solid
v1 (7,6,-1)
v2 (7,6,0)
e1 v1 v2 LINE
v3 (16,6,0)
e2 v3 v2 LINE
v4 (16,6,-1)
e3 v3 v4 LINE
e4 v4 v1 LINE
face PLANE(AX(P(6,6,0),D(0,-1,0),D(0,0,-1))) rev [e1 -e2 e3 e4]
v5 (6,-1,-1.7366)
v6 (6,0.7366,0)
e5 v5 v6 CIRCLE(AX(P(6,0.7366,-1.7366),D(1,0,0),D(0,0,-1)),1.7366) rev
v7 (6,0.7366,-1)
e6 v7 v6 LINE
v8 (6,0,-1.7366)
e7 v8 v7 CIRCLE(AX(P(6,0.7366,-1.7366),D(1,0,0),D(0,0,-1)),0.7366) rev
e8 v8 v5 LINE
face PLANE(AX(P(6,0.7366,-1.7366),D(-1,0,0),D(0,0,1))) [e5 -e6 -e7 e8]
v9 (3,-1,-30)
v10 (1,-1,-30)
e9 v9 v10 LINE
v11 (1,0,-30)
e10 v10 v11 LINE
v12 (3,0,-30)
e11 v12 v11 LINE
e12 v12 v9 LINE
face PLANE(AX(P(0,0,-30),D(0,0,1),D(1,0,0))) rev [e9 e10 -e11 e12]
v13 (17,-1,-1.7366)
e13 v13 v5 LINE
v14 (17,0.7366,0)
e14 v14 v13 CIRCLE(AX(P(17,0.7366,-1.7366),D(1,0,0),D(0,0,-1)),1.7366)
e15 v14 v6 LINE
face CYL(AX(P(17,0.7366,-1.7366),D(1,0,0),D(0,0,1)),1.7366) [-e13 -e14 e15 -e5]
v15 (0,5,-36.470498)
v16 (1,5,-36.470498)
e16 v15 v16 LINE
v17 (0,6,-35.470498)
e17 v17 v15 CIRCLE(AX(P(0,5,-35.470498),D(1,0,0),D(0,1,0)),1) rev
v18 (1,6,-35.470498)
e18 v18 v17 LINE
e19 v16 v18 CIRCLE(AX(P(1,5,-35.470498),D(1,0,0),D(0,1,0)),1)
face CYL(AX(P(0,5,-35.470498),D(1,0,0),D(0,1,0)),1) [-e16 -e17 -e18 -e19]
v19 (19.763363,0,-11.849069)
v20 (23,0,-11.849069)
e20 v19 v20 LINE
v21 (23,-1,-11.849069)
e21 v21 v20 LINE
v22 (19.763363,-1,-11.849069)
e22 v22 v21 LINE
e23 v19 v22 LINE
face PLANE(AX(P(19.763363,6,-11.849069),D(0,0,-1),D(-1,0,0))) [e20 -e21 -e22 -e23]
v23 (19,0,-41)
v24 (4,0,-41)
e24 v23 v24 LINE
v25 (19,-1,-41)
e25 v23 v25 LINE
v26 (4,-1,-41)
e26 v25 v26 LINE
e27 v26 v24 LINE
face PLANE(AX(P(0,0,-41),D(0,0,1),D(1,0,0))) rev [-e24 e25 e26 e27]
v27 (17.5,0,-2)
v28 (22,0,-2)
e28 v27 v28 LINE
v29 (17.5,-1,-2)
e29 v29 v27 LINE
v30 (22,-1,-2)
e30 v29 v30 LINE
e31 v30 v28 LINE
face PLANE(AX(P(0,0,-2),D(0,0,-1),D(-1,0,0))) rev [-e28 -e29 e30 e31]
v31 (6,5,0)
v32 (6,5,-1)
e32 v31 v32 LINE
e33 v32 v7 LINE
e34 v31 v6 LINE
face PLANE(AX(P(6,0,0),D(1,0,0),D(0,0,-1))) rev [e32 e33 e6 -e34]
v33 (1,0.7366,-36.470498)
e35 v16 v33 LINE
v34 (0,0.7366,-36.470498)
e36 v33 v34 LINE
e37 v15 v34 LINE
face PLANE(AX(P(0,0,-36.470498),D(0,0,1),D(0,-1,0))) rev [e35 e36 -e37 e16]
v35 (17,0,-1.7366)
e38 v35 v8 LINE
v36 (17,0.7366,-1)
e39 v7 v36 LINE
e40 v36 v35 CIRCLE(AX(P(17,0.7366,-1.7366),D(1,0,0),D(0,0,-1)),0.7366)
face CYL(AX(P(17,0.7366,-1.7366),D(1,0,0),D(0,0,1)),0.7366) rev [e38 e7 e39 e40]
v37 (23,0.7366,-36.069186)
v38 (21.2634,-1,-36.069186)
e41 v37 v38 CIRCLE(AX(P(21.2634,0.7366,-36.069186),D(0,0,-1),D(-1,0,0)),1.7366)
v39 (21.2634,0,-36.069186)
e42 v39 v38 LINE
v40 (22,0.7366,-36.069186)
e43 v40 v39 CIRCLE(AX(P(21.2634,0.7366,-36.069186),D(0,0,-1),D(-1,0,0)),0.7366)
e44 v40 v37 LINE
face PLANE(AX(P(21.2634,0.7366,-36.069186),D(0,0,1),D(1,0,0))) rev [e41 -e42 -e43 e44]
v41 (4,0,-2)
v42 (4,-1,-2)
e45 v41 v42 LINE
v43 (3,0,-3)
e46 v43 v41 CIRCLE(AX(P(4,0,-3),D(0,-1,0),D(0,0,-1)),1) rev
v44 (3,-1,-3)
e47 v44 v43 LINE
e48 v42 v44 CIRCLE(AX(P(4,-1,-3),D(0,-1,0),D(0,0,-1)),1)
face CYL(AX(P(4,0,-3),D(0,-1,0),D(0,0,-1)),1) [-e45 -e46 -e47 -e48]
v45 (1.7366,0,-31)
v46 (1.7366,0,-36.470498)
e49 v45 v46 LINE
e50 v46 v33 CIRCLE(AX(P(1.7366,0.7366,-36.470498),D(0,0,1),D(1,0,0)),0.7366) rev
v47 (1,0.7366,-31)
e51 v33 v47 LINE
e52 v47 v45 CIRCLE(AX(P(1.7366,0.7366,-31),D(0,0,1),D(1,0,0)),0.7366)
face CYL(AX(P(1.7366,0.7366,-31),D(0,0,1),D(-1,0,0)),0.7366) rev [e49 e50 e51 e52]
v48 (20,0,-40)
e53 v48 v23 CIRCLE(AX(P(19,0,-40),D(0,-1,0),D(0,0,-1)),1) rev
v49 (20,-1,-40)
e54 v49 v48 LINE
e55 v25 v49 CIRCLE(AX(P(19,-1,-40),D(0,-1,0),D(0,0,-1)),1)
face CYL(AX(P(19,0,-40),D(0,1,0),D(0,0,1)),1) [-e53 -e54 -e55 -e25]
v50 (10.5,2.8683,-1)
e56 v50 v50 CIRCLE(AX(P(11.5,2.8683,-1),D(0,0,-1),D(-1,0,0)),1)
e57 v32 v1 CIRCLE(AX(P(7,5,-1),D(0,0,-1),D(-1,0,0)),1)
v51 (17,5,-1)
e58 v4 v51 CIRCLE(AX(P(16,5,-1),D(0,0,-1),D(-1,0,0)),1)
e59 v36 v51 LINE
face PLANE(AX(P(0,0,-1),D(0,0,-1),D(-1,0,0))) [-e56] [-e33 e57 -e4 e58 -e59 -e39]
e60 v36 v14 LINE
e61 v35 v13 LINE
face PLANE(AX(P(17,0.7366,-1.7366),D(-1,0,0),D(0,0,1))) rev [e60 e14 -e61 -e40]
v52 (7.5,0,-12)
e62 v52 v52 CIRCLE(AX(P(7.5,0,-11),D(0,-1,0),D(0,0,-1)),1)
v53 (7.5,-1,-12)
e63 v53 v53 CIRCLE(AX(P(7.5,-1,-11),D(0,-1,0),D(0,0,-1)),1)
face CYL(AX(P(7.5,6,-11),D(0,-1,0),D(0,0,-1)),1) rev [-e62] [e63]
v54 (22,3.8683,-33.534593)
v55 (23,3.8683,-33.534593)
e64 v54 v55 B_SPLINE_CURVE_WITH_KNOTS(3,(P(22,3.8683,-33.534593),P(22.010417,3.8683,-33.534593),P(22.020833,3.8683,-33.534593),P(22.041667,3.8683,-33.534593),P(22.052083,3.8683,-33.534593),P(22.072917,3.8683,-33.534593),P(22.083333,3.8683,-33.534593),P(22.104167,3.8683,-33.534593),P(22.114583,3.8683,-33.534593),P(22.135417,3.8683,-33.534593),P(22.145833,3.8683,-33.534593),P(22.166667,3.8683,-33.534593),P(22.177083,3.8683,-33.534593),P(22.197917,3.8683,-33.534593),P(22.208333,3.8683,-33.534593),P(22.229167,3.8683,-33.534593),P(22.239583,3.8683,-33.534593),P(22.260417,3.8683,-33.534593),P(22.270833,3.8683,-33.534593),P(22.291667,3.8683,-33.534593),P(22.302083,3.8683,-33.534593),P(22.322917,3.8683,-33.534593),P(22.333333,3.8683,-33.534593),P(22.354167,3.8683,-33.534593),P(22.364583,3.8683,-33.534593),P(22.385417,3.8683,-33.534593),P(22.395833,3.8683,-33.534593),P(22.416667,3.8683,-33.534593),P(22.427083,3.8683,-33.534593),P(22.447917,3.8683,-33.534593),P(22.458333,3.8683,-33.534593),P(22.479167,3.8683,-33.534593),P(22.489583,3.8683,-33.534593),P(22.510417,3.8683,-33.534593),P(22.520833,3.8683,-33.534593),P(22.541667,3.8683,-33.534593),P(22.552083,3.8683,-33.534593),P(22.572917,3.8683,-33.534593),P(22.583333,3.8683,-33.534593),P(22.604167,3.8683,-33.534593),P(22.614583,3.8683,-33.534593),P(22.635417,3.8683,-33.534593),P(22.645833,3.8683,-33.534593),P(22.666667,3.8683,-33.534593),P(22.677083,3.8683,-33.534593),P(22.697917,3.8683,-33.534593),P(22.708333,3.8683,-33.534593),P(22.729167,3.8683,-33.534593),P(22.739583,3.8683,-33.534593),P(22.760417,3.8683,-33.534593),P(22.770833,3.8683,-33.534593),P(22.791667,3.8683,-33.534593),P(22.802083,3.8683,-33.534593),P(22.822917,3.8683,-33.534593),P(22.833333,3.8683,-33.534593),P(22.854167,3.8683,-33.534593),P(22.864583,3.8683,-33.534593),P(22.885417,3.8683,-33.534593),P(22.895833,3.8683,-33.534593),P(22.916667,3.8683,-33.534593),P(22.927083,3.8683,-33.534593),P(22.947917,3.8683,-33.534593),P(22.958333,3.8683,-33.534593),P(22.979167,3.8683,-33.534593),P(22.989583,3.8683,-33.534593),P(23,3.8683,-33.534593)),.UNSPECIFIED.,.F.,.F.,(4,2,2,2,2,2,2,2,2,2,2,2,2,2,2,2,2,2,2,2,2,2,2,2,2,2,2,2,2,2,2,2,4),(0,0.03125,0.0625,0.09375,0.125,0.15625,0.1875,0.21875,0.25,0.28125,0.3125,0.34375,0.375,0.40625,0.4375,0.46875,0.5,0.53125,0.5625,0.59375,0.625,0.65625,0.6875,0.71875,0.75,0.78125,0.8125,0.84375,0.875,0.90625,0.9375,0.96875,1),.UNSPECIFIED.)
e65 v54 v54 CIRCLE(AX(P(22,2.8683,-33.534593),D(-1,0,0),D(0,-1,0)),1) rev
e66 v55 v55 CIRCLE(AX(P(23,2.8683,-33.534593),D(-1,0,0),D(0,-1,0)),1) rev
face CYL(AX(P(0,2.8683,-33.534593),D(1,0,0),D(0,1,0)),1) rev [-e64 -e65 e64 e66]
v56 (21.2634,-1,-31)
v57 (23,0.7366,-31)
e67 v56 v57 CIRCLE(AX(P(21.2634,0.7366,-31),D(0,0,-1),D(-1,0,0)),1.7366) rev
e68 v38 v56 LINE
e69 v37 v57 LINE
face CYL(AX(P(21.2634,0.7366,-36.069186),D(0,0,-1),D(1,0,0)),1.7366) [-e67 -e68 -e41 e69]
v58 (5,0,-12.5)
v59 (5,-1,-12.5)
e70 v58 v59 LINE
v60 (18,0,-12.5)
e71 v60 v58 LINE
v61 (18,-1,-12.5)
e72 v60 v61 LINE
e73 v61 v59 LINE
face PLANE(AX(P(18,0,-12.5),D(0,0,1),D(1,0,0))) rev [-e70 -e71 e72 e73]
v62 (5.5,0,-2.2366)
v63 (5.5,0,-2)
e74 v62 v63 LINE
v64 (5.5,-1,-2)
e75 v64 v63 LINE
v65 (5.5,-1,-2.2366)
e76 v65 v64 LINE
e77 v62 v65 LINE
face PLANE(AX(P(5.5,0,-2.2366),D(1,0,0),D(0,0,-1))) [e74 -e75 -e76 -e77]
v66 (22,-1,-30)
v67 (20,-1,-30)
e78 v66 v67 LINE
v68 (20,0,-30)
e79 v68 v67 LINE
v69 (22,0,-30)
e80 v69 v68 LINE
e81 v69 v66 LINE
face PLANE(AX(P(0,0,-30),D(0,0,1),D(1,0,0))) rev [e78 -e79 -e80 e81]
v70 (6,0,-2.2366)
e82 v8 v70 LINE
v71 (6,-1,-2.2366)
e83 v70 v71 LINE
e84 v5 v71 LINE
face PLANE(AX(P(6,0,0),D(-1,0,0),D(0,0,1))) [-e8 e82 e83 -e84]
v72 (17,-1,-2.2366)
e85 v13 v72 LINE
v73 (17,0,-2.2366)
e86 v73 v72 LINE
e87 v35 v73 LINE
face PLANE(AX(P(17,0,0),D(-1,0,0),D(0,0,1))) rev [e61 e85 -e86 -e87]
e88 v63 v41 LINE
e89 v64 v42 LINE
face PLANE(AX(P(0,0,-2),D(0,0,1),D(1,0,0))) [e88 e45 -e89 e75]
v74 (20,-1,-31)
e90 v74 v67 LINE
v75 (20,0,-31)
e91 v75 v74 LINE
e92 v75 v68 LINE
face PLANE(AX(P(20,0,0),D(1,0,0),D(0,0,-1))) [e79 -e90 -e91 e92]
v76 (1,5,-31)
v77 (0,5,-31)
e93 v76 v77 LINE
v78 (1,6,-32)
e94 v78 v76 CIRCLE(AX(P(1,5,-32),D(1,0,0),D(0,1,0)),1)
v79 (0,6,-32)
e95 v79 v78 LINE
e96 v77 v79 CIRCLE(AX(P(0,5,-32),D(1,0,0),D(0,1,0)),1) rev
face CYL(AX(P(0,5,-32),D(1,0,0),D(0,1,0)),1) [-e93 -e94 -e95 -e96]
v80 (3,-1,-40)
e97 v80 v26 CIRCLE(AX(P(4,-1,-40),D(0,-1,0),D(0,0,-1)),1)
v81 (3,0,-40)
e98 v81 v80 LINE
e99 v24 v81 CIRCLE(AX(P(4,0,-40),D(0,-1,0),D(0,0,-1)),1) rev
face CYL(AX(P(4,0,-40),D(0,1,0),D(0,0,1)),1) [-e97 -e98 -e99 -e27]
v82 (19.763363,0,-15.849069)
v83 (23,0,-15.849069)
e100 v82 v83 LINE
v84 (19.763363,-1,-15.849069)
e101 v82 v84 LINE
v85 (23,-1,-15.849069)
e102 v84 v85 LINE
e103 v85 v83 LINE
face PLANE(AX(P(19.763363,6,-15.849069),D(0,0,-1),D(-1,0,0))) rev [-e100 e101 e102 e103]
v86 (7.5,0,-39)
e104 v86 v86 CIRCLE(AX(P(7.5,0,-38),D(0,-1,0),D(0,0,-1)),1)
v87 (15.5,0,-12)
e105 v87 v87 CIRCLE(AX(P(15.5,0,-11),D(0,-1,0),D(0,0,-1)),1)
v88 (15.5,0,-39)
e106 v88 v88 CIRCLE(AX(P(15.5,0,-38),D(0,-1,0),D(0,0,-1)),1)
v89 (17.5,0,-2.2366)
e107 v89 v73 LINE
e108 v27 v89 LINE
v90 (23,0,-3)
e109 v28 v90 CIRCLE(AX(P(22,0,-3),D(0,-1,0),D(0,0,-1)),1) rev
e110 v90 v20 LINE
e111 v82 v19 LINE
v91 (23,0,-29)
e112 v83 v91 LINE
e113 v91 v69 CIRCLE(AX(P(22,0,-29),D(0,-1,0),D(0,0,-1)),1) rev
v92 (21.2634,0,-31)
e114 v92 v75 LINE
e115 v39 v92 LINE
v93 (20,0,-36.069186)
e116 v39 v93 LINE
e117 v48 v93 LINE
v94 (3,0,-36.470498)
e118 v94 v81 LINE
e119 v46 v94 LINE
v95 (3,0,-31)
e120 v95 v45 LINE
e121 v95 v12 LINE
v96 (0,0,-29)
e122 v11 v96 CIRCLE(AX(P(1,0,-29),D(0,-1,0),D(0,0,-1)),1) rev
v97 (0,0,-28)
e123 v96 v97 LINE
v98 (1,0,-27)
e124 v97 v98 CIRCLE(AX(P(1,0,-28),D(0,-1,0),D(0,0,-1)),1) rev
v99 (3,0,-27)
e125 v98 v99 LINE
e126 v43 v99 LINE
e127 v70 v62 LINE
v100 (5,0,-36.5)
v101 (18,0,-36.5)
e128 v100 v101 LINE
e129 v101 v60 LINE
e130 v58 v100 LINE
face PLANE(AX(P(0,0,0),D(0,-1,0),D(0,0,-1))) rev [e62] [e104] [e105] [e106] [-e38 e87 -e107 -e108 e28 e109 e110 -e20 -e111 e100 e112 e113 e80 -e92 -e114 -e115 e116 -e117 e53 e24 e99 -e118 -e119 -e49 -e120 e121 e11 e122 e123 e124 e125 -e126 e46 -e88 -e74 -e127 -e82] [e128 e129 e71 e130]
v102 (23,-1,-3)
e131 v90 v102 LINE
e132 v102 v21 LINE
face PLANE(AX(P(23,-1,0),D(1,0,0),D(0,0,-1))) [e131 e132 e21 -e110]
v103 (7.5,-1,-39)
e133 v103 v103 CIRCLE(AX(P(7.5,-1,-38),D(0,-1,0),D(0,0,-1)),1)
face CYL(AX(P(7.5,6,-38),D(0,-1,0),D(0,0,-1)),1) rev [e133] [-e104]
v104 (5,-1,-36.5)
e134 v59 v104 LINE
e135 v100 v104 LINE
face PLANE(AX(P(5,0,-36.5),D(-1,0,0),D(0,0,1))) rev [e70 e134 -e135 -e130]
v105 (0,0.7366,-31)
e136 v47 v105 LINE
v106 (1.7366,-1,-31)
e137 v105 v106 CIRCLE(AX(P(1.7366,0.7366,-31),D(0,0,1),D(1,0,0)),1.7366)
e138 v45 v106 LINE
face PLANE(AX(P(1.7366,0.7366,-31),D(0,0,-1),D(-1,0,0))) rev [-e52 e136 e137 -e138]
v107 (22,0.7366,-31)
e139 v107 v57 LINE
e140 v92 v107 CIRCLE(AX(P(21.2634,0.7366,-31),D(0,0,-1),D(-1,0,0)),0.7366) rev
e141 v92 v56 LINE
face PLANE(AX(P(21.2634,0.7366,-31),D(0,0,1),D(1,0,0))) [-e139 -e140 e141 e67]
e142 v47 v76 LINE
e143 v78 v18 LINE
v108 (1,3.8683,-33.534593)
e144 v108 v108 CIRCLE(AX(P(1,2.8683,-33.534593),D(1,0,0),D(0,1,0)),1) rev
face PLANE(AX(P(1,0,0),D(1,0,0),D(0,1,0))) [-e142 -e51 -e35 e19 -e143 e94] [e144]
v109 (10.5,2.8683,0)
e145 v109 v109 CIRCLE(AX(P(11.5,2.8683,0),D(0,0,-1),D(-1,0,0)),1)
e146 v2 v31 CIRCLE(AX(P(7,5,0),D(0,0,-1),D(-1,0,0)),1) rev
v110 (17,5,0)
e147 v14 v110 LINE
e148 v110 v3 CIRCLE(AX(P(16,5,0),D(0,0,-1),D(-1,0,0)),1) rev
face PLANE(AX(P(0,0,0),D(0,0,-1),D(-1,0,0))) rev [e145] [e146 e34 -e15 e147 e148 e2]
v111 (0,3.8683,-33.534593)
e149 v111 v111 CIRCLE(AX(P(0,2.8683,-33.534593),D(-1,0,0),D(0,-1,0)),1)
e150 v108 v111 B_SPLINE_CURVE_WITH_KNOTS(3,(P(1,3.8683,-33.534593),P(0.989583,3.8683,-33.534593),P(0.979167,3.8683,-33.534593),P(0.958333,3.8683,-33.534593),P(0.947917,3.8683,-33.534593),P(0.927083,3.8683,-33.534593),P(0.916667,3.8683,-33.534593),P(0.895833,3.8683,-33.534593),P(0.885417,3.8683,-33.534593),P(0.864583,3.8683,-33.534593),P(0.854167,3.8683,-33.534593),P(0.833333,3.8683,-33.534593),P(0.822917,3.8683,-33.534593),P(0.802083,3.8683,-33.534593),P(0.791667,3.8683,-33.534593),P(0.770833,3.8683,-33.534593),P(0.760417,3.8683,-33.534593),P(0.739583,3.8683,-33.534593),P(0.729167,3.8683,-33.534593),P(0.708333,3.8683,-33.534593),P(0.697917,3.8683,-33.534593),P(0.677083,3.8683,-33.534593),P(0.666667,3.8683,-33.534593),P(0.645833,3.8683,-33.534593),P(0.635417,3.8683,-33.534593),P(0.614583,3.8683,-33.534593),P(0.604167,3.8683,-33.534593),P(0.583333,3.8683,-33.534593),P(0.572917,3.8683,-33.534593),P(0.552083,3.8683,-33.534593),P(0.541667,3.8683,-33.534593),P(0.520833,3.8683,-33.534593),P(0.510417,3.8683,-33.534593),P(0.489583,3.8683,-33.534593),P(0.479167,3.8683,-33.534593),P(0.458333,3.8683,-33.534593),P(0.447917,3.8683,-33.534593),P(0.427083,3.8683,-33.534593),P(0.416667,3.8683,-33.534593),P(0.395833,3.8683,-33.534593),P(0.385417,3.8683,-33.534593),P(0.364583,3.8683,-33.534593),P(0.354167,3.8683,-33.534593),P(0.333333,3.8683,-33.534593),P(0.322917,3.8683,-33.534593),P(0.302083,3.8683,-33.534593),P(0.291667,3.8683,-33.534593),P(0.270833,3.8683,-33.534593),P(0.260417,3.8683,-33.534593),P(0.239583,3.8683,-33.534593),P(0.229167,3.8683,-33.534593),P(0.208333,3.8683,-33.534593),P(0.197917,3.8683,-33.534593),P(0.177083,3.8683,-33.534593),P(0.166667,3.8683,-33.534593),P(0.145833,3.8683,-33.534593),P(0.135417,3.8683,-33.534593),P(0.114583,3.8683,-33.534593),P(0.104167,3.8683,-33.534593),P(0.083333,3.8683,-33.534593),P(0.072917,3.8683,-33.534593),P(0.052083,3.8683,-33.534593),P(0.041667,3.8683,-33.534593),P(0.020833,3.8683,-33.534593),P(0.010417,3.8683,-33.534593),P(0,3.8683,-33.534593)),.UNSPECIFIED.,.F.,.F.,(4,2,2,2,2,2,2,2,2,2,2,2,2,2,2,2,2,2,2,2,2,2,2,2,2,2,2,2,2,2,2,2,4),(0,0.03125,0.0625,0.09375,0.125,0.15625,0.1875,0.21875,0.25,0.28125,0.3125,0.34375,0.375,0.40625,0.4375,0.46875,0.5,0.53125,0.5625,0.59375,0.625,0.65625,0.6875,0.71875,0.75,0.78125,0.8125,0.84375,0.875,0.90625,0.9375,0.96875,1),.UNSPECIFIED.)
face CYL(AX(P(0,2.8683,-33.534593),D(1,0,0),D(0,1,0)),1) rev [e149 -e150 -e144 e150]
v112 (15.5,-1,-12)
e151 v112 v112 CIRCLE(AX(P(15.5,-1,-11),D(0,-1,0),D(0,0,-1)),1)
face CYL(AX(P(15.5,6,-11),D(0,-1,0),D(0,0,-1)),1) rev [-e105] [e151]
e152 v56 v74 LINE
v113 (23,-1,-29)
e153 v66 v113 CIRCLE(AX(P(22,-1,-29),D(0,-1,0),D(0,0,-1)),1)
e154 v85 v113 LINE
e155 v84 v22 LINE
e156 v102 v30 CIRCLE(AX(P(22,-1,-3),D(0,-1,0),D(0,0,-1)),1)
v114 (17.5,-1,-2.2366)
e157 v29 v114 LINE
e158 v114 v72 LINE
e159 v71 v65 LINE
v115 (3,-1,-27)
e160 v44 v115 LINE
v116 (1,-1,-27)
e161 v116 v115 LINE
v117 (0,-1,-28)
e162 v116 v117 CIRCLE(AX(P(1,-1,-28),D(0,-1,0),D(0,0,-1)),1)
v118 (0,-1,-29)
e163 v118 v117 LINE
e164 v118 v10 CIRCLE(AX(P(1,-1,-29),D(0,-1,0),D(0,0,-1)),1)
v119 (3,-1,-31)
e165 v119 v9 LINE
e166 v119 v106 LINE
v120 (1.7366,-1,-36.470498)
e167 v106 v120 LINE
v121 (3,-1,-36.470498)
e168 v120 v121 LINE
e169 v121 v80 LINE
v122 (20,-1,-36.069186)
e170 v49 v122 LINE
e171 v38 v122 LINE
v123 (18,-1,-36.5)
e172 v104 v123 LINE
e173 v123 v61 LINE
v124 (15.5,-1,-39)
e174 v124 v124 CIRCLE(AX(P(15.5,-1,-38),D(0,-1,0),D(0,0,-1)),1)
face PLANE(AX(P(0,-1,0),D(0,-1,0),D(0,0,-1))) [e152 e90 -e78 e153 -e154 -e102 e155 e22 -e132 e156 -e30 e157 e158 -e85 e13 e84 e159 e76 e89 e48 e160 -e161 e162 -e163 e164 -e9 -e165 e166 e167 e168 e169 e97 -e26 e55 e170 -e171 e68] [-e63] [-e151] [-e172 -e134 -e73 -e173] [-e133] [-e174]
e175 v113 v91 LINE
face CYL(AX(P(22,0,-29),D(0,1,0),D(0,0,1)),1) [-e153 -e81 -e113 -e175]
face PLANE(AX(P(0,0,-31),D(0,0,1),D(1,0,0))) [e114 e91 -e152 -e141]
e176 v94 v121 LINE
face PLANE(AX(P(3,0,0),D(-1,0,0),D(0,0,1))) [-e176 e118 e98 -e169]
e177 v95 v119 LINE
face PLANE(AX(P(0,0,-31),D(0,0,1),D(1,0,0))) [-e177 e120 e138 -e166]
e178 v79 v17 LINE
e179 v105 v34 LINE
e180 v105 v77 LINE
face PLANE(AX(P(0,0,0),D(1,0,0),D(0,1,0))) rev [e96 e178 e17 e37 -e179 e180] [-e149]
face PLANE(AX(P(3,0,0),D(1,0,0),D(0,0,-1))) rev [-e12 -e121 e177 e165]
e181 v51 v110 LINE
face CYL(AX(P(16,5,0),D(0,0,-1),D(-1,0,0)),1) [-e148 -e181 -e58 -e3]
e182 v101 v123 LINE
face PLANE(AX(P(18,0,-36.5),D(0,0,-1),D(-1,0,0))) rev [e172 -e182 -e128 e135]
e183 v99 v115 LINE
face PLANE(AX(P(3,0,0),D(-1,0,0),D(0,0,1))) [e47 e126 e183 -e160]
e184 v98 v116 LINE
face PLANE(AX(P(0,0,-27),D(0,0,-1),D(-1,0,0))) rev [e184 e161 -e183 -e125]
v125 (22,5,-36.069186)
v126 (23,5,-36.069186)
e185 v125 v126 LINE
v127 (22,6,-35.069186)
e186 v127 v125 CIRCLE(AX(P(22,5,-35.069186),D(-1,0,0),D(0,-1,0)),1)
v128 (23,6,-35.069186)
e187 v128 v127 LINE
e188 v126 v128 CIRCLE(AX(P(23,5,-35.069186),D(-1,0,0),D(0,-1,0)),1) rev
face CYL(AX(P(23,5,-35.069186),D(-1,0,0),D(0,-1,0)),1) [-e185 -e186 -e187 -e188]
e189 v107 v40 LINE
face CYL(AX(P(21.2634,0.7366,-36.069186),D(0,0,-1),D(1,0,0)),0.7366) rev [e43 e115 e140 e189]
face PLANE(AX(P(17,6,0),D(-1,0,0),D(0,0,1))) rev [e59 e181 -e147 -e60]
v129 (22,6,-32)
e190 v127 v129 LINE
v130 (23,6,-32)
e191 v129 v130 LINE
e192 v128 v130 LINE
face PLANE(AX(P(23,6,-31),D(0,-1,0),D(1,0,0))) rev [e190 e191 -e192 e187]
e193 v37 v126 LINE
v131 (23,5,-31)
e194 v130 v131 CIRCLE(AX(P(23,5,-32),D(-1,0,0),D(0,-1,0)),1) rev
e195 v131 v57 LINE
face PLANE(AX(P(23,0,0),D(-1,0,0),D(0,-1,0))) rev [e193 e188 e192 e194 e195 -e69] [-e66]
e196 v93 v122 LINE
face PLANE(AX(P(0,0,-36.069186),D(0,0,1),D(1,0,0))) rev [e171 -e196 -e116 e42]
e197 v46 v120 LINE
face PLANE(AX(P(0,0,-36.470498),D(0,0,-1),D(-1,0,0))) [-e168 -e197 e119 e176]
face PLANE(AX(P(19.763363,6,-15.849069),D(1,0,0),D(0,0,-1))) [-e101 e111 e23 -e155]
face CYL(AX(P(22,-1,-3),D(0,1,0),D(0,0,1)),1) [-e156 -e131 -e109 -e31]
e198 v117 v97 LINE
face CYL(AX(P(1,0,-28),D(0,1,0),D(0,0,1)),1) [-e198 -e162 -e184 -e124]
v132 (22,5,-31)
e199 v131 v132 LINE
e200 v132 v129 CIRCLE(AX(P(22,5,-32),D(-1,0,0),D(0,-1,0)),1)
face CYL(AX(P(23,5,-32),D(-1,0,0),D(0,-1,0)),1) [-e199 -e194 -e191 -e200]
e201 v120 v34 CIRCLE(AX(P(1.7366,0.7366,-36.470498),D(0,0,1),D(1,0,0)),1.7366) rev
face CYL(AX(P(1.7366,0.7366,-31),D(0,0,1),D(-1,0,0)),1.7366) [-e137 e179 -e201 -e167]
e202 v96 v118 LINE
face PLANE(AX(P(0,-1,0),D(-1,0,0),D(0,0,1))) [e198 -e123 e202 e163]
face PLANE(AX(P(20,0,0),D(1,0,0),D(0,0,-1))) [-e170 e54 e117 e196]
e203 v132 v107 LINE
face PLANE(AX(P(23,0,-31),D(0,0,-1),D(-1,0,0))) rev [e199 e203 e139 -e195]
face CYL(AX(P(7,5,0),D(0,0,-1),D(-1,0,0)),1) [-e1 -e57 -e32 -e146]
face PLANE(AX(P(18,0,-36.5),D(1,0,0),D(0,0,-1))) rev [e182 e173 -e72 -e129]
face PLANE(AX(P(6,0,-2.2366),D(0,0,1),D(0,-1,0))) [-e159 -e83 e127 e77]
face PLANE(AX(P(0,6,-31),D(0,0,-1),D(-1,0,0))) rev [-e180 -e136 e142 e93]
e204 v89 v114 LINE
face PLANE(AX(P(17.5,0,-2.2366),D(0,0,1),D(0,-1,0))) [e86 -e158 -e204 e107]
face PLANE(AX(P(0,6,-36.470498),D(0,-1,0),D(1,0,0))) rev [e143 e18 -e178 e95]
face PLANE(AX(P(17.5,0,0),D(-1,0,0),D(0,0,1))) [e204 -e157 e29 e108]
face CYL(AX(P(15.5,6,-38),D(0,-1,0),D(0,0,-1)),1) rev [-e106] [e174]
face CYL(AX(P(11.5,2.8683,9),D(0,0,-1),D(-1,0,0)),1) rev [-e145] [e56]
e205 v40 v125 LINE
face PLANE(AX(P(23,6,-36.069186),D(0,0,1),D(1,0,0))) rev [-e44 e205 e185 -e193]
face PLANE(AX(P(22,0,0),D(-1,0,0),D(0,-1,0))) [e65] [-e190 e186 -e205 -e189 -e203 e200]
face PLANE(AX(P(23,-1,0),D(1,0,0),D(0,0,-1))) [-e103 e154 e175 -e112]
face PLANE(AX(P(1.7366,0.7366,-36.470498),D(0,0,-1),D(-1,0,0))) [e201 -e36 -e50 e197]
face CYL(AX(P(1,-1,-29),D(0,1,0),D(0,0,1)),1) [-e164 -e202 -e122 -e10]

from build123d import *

# Parameters (mm, degrees)
SKETCH1_W                = 23
SKETCH1_H                = 50
BASE_FLANGE1_DEPTH       = 1
SKETCH8_W                = 13
SKETCH8_H                = 24
CUT_EXTRUDE2_DEPTH       = 56.045435778
SKETCH9_W                = 17
SKETCH9_H                = 9
SKETCH9_W_2              = 3
SKETCH9_H_2              = 1
SKETCH9_H_3              = 25
SKETCH9_W_3              = 6
SKETCH9_H_4              = 2
CUT_EXTRUDE3_DEPTH       = 56.045435778
EDGE_FLANGE1_START       = -36.069185562
EDGE_FLANGE1_DEPTH       = 5.069185562
EDGE_FLANGE1_START_2     = -36.470498128
EDGE_FLANGE1_2_DEPTH     = 0.401312566
EDGE_FLANGE1_START_3     = 6
EDGE_FLANGE1_3_DEPTH     = 11
EDGE_FLANGE1_4_DEPTH     = 5.470498128
EDGE_FLANGE1_START_4     = -2.2366
EDGE_FLANGE1_5_OUTLINE_W = 0.5
EDGE_FLANGE1_5_OUTLINE_H = 1
EDGE_FLANGE1_5_DEPTH     = 0.2366
EDGE_FLANGE1_6_DEPTH     = 11
FILLET1_R                = 1
SKETCH19_W               = 4.427639712
SKETCH19_H               = 4
CUT_EXTRUDE4_DEPTH       = 48.528938553
SKETCH20_R               = 1
CUT_EXTRUDE5_DEPTH       = 48.528938553
SKETCH21_R               = 1
CUT_EXTRUDE6_DEPTH       = 10
CUT_EXTRUDE7_DEPTH       = 47.914816423
CUT_EXTRUDE7_DEPTH_BACK  = 10
SKETCH22_R               = 1
FILLET2_R                = 1


# Read off the part's stored shape, not the designer's step: Edge-Flange1
# Sheet-metal steps are written as plain solids
with BuildPart() as part:
    # Sketch1 → Base-Flange1 (new body)
    with BuildSketch(Plane(origin=(0, 0, 0), x_dir=(1, 0, 0), z_dir=(0, 1, 0))):
        with Locations((11.5, 25)):
            Rectangle(SKETCH1_W, SKETCH1_H)
    extrude(amount=-BASE_FLANGE1_DEPTH)

    # Sketch8 → Cut-Extrude2 (cut, through all)
    with BuildSketch(Plane.XZ.offset(1)):
        with Locations((11.5, -24.5)):
            Rectangle(SKETCH8_W, SKETCH8_H)
    extrude(amount=-CUT_EXTRUDE2_DEPTH, mode=Mode.SUBTRACT)

    # Sketch9 → Cut-Extrude3 (cut, through all)
    with BuildSketch(Plane.XZ.offset(1)):
        with Locations((11.5, -45.5)):
            Rectangle(SKETCH9_W, SKETCH9_H)
        Polygon((0, -50), (3, -50), (3, -41), (3, -36.470498128), (0, -36.470498128), align=None)
        Polygon((23, -50), (23, -36.069185562), (20, -36.069185562), (20, -41), (20, -50), align=None)
        with Locations((21.5, -30.5)):
            Rectangle(SKETCH9_W_2, SKETCH9_H_2)
        with Locations((1.5, -30.5)):
            Rectangle(SKETCH9_W_2, SKETCH9_H_2)
        with Locations((1.5, -14.5)):
            Rectangle(SKETCH9_W_2, SKETCH9_H_3)
        with Locations((20, -1)):
            Rectangle(SKETCH9_W_3, SKETCH9_H_4)
        with Locations((4.5, -1)):
            Rectangle(SKETCH9_W_2, SKETCH9_H_4)
        with Locations((1.5, -1)):
            Rectangle(SKETCH9_W_2, SKETCH9_H_4)
    extrude(amount=-CUT_EXTRUDE3_DEPTH, mode=Mode.SUBTRACT)

    # Edge-Flange1 outline → Edge-Flange1 (add)
    with BuildSketch(Plane.XY.offset(EDGE_FLANGE1_START)):
        with BuildLine():
            Line((23, 0.7366), (23, 6))
            Line((23, 6), (22, 6))
            Line((22, 6), (22, 0.7366))
            ThreePointArc((22, 0.7366), (21.784254855, 0.215745145), (21.2634, 0))
            Line((21.2634, 0), (22.83604109, 0))
            ThreePointArc((22.83604109, 0), (22.958514757, 0.359286442), (23, 0.7366))
        make_face()
        with BuildLine():
            Line((0.16395891, 0), (1.7366, 0))
            ThreePointArc((1.7366, 0), (1.215745145, 0.215745145), (1, 0.7366))
            Line((1, 0.7366), (1, 6))
            Line((1, 6), (0, 6))
            Line((0, 6), (0, 0.7366))
            ThreePointArc((0, 0.7366), (0.041485243, 0.359286442), (0.16395891, 0))
        make_face()
    extrude(amount=EDGE_FLANGE1_DEPTH)

    # Edge-Flange1 2 outline → Edge-Flange1 2 (add)
    with BuildSketch(Plane.XY.offset(EDGE_FLANGE1_START_2)):
        with BuildLine():
            Line((0.16395891, 0), (1.7366, 0))
            ThreePointArc((1.7366, 0), (1.215745145, 0.215745145), (1, 0.7366))
            Line((1, 0.7366), (1, 6))
            Line((1, 6), (0, 6))
            Line((0, 6), (0, 0.7366))
            ThreePointArc((0, 0.7366), (0.041485243, 0.359286442), (0.16395891, 0))
        make_face()
    extrude(amount=EDGE_FLANGE1_2_DEPTH)

    # Edge-Flange1 3 outline → Edge-Flange1 3 (add)
    with BuildSketch(Plane.YZ.offset(EDGE_FLANGE1_START_3)):
        with BuildLine():
            Line((6, 0), (0.7366, 0))
            ThreePointArc((0.7366, 0), (0.359286442, -0.041485243), (0, -0.16395891))
            Line((0, -0.16395891), (0, -1.7366))
            ThreePointArc((0, -1.7366), (0.215745145, -1.215745145), (0.7366, -1))
            Line((0.7366, -1), (6, -1))
            Line((6, -1), (6, 0))
        make_face()
    extrude(amount=EDGE_FLANGE1_3_DEPTH)

    # Edge-Flange1 4 outline → Edge-Flange1 4 (cut)
    with BuildSketch(Plane.XY.offset(EDGE_FLANGE1_START_2)):
        with BuildLine():
            Line((23, 0), (22.83604109, 0))
            ThreePointArc((22.83604109, 0), (22.195226164, -0.728828115), (21.2634, -1))
            Line((21.2634, -1), (23, -1))
            Line((23, -1), (23, 0))
        make_face()
        with BuildLine():
            Line((0, -1), (1.7366, -1))
            ThreePointArc((1.7366, -1), (0.804773836, -0.728828115), (0.16395891, 0))
            Line((0.16395891, 0), (0, 0))
            Line((0, 0), (0, -1))
        make_face()
    extrude(amount=EDGE_FLANGE1_4_DEPTH, mode=Mode.SUBTRACT)

    # Edge-Flange1 5 outline → Edge-Flange1 5 (cut)
    with BuildSketch(Plane.XY.offset(EDGE_FLANGE1_START_4)):
        with Locations((17.25, -0.5)):
            Rectangle(EDGE_FLANGE1_5_OUTLINE_W, EDGE_FLANGE1_5_OUTLINE_H)
        with Locations((5.75, -0.5)):
            Rectangle(EDGE_FLANGE1_5_OUTLINE_W, EDGE_FLANGE1_5_OUTLINE_H)
    extrude(amount=EDGE_FLANGE1_5_DEPTH, mode=Mode.SUBTRACT)

    # Edge-Flange1 6 outline → Edge-Flange1 6 (cut)
    with BuildSketch(Plane.YZ.offset(EDGE_FLANGE1_START_3)):
        with BuildLine():
            ThreePointArc((-1, -1.7366), (-0.728828115, -0.804773836), (0, -0.16395891))
            Line((0, -0.16395891), (0, 0))
            Line((0, 0), (-1, 0))
            Line((-1, 0), (-1, -1.7366))
        make_face()
    extrude(amount=EDGE_FLANGE1_6_DEPTH, mode=Mode.SUBTRACT)

    # Fillet1
    fillet1_edges = [part.edges().sort_by_distance(p)[0] for p in [
        (3, -0.5, -2),
        (0, -0.5, -27),
        (6, 6, -0.5),
        (17, 6, -0.5),
        (0.5, 6, -36.470498128),
        (0.5, 6, -31),
        (22.5, 6, -31),
        (22.5, 6, -36.069185562),
        (23, -0.5, -30),
        (0, -0.5, -30),
        (23, -0.5, -2),
    ]]
    fillet(fillet1_edges, radius=FILLET1_R)

    # Sketch19 → Cut-Extrude4 (cut, through all)
    with BuildSketch(Plane.XZ.offset(1)):
        with Locations((21.977182604, -13.849068818)):
            Rectangle(SKETCH19_W, SKETCH19_H)
    extrude(amount=-CUT_EXTRUDE4_DEPTH, mode=Mode.SUBTRACT)

    # Sketch20 → Cut-Extrude5 (cut, through all)
    with BuildSketch(Plane.XZ.offset(1)):
        with Locations(Location((7.5, -11, 0), (0, 0, 270))):
            Circle(SKETCH20_R)
        with Locations(Location((15.5, -11, 0), (0, 0, 270))):
            Circle(SKETCH20_R)
        with Locations(Location((7.5, -38, 0), (0, 0, 270))):
            Circle(SKETCH20_R)
        with Locations(Location((15.5, -38, 0), (0, 0, 270))):
            Circle(SKETCH20_R)
    extrude(amount=-CUT_EXTRUDE5_DEPTH, mode=Mode.SUBTRACT)

    # Sketch21 → Cut-Extrude6 (cut)
    with BuildSketch(Plane(origin=(0, 0, -1), x_dir=(-1, 0, 0), z_dir=(0, 0, -1))):
        with Locations((-11.5, 2.8683)):
            Circle(SKETCH21_R)
    extrude(amount=-CUT_EXTRUDE6_DEPTH, mode=Mode.SUBTRACT)

    # Sketch22 → Cut-Extrude7 (cut, two sides: drawn at the far end of the back side and taken through both)
    with BuildSketch(Plane.ZY.offset(-22).offset(-CUT_EXTRUDE7_DEPTH_BACK)):
        with Locations(Location((-33.534592781, 2.8683, 0), (0, 0, 90))):
            Circle(SKETCH22_R)
    extrude(amount=CUT_EXTRUDE7_DEPTH + CUT_EXTRUDE7_DEPTH_BACK, mode=Mode.SUBTRACT)

    # Fillet2
    fillet2_edges = [part.edges().sort_by_distance(p)[0] for p in [
        (3, -0.5, -41),
        (20, -0.5, -41),
    ]]
    fillet(fillet2_edges, radius=FILLET2_R)


solid = part.part
